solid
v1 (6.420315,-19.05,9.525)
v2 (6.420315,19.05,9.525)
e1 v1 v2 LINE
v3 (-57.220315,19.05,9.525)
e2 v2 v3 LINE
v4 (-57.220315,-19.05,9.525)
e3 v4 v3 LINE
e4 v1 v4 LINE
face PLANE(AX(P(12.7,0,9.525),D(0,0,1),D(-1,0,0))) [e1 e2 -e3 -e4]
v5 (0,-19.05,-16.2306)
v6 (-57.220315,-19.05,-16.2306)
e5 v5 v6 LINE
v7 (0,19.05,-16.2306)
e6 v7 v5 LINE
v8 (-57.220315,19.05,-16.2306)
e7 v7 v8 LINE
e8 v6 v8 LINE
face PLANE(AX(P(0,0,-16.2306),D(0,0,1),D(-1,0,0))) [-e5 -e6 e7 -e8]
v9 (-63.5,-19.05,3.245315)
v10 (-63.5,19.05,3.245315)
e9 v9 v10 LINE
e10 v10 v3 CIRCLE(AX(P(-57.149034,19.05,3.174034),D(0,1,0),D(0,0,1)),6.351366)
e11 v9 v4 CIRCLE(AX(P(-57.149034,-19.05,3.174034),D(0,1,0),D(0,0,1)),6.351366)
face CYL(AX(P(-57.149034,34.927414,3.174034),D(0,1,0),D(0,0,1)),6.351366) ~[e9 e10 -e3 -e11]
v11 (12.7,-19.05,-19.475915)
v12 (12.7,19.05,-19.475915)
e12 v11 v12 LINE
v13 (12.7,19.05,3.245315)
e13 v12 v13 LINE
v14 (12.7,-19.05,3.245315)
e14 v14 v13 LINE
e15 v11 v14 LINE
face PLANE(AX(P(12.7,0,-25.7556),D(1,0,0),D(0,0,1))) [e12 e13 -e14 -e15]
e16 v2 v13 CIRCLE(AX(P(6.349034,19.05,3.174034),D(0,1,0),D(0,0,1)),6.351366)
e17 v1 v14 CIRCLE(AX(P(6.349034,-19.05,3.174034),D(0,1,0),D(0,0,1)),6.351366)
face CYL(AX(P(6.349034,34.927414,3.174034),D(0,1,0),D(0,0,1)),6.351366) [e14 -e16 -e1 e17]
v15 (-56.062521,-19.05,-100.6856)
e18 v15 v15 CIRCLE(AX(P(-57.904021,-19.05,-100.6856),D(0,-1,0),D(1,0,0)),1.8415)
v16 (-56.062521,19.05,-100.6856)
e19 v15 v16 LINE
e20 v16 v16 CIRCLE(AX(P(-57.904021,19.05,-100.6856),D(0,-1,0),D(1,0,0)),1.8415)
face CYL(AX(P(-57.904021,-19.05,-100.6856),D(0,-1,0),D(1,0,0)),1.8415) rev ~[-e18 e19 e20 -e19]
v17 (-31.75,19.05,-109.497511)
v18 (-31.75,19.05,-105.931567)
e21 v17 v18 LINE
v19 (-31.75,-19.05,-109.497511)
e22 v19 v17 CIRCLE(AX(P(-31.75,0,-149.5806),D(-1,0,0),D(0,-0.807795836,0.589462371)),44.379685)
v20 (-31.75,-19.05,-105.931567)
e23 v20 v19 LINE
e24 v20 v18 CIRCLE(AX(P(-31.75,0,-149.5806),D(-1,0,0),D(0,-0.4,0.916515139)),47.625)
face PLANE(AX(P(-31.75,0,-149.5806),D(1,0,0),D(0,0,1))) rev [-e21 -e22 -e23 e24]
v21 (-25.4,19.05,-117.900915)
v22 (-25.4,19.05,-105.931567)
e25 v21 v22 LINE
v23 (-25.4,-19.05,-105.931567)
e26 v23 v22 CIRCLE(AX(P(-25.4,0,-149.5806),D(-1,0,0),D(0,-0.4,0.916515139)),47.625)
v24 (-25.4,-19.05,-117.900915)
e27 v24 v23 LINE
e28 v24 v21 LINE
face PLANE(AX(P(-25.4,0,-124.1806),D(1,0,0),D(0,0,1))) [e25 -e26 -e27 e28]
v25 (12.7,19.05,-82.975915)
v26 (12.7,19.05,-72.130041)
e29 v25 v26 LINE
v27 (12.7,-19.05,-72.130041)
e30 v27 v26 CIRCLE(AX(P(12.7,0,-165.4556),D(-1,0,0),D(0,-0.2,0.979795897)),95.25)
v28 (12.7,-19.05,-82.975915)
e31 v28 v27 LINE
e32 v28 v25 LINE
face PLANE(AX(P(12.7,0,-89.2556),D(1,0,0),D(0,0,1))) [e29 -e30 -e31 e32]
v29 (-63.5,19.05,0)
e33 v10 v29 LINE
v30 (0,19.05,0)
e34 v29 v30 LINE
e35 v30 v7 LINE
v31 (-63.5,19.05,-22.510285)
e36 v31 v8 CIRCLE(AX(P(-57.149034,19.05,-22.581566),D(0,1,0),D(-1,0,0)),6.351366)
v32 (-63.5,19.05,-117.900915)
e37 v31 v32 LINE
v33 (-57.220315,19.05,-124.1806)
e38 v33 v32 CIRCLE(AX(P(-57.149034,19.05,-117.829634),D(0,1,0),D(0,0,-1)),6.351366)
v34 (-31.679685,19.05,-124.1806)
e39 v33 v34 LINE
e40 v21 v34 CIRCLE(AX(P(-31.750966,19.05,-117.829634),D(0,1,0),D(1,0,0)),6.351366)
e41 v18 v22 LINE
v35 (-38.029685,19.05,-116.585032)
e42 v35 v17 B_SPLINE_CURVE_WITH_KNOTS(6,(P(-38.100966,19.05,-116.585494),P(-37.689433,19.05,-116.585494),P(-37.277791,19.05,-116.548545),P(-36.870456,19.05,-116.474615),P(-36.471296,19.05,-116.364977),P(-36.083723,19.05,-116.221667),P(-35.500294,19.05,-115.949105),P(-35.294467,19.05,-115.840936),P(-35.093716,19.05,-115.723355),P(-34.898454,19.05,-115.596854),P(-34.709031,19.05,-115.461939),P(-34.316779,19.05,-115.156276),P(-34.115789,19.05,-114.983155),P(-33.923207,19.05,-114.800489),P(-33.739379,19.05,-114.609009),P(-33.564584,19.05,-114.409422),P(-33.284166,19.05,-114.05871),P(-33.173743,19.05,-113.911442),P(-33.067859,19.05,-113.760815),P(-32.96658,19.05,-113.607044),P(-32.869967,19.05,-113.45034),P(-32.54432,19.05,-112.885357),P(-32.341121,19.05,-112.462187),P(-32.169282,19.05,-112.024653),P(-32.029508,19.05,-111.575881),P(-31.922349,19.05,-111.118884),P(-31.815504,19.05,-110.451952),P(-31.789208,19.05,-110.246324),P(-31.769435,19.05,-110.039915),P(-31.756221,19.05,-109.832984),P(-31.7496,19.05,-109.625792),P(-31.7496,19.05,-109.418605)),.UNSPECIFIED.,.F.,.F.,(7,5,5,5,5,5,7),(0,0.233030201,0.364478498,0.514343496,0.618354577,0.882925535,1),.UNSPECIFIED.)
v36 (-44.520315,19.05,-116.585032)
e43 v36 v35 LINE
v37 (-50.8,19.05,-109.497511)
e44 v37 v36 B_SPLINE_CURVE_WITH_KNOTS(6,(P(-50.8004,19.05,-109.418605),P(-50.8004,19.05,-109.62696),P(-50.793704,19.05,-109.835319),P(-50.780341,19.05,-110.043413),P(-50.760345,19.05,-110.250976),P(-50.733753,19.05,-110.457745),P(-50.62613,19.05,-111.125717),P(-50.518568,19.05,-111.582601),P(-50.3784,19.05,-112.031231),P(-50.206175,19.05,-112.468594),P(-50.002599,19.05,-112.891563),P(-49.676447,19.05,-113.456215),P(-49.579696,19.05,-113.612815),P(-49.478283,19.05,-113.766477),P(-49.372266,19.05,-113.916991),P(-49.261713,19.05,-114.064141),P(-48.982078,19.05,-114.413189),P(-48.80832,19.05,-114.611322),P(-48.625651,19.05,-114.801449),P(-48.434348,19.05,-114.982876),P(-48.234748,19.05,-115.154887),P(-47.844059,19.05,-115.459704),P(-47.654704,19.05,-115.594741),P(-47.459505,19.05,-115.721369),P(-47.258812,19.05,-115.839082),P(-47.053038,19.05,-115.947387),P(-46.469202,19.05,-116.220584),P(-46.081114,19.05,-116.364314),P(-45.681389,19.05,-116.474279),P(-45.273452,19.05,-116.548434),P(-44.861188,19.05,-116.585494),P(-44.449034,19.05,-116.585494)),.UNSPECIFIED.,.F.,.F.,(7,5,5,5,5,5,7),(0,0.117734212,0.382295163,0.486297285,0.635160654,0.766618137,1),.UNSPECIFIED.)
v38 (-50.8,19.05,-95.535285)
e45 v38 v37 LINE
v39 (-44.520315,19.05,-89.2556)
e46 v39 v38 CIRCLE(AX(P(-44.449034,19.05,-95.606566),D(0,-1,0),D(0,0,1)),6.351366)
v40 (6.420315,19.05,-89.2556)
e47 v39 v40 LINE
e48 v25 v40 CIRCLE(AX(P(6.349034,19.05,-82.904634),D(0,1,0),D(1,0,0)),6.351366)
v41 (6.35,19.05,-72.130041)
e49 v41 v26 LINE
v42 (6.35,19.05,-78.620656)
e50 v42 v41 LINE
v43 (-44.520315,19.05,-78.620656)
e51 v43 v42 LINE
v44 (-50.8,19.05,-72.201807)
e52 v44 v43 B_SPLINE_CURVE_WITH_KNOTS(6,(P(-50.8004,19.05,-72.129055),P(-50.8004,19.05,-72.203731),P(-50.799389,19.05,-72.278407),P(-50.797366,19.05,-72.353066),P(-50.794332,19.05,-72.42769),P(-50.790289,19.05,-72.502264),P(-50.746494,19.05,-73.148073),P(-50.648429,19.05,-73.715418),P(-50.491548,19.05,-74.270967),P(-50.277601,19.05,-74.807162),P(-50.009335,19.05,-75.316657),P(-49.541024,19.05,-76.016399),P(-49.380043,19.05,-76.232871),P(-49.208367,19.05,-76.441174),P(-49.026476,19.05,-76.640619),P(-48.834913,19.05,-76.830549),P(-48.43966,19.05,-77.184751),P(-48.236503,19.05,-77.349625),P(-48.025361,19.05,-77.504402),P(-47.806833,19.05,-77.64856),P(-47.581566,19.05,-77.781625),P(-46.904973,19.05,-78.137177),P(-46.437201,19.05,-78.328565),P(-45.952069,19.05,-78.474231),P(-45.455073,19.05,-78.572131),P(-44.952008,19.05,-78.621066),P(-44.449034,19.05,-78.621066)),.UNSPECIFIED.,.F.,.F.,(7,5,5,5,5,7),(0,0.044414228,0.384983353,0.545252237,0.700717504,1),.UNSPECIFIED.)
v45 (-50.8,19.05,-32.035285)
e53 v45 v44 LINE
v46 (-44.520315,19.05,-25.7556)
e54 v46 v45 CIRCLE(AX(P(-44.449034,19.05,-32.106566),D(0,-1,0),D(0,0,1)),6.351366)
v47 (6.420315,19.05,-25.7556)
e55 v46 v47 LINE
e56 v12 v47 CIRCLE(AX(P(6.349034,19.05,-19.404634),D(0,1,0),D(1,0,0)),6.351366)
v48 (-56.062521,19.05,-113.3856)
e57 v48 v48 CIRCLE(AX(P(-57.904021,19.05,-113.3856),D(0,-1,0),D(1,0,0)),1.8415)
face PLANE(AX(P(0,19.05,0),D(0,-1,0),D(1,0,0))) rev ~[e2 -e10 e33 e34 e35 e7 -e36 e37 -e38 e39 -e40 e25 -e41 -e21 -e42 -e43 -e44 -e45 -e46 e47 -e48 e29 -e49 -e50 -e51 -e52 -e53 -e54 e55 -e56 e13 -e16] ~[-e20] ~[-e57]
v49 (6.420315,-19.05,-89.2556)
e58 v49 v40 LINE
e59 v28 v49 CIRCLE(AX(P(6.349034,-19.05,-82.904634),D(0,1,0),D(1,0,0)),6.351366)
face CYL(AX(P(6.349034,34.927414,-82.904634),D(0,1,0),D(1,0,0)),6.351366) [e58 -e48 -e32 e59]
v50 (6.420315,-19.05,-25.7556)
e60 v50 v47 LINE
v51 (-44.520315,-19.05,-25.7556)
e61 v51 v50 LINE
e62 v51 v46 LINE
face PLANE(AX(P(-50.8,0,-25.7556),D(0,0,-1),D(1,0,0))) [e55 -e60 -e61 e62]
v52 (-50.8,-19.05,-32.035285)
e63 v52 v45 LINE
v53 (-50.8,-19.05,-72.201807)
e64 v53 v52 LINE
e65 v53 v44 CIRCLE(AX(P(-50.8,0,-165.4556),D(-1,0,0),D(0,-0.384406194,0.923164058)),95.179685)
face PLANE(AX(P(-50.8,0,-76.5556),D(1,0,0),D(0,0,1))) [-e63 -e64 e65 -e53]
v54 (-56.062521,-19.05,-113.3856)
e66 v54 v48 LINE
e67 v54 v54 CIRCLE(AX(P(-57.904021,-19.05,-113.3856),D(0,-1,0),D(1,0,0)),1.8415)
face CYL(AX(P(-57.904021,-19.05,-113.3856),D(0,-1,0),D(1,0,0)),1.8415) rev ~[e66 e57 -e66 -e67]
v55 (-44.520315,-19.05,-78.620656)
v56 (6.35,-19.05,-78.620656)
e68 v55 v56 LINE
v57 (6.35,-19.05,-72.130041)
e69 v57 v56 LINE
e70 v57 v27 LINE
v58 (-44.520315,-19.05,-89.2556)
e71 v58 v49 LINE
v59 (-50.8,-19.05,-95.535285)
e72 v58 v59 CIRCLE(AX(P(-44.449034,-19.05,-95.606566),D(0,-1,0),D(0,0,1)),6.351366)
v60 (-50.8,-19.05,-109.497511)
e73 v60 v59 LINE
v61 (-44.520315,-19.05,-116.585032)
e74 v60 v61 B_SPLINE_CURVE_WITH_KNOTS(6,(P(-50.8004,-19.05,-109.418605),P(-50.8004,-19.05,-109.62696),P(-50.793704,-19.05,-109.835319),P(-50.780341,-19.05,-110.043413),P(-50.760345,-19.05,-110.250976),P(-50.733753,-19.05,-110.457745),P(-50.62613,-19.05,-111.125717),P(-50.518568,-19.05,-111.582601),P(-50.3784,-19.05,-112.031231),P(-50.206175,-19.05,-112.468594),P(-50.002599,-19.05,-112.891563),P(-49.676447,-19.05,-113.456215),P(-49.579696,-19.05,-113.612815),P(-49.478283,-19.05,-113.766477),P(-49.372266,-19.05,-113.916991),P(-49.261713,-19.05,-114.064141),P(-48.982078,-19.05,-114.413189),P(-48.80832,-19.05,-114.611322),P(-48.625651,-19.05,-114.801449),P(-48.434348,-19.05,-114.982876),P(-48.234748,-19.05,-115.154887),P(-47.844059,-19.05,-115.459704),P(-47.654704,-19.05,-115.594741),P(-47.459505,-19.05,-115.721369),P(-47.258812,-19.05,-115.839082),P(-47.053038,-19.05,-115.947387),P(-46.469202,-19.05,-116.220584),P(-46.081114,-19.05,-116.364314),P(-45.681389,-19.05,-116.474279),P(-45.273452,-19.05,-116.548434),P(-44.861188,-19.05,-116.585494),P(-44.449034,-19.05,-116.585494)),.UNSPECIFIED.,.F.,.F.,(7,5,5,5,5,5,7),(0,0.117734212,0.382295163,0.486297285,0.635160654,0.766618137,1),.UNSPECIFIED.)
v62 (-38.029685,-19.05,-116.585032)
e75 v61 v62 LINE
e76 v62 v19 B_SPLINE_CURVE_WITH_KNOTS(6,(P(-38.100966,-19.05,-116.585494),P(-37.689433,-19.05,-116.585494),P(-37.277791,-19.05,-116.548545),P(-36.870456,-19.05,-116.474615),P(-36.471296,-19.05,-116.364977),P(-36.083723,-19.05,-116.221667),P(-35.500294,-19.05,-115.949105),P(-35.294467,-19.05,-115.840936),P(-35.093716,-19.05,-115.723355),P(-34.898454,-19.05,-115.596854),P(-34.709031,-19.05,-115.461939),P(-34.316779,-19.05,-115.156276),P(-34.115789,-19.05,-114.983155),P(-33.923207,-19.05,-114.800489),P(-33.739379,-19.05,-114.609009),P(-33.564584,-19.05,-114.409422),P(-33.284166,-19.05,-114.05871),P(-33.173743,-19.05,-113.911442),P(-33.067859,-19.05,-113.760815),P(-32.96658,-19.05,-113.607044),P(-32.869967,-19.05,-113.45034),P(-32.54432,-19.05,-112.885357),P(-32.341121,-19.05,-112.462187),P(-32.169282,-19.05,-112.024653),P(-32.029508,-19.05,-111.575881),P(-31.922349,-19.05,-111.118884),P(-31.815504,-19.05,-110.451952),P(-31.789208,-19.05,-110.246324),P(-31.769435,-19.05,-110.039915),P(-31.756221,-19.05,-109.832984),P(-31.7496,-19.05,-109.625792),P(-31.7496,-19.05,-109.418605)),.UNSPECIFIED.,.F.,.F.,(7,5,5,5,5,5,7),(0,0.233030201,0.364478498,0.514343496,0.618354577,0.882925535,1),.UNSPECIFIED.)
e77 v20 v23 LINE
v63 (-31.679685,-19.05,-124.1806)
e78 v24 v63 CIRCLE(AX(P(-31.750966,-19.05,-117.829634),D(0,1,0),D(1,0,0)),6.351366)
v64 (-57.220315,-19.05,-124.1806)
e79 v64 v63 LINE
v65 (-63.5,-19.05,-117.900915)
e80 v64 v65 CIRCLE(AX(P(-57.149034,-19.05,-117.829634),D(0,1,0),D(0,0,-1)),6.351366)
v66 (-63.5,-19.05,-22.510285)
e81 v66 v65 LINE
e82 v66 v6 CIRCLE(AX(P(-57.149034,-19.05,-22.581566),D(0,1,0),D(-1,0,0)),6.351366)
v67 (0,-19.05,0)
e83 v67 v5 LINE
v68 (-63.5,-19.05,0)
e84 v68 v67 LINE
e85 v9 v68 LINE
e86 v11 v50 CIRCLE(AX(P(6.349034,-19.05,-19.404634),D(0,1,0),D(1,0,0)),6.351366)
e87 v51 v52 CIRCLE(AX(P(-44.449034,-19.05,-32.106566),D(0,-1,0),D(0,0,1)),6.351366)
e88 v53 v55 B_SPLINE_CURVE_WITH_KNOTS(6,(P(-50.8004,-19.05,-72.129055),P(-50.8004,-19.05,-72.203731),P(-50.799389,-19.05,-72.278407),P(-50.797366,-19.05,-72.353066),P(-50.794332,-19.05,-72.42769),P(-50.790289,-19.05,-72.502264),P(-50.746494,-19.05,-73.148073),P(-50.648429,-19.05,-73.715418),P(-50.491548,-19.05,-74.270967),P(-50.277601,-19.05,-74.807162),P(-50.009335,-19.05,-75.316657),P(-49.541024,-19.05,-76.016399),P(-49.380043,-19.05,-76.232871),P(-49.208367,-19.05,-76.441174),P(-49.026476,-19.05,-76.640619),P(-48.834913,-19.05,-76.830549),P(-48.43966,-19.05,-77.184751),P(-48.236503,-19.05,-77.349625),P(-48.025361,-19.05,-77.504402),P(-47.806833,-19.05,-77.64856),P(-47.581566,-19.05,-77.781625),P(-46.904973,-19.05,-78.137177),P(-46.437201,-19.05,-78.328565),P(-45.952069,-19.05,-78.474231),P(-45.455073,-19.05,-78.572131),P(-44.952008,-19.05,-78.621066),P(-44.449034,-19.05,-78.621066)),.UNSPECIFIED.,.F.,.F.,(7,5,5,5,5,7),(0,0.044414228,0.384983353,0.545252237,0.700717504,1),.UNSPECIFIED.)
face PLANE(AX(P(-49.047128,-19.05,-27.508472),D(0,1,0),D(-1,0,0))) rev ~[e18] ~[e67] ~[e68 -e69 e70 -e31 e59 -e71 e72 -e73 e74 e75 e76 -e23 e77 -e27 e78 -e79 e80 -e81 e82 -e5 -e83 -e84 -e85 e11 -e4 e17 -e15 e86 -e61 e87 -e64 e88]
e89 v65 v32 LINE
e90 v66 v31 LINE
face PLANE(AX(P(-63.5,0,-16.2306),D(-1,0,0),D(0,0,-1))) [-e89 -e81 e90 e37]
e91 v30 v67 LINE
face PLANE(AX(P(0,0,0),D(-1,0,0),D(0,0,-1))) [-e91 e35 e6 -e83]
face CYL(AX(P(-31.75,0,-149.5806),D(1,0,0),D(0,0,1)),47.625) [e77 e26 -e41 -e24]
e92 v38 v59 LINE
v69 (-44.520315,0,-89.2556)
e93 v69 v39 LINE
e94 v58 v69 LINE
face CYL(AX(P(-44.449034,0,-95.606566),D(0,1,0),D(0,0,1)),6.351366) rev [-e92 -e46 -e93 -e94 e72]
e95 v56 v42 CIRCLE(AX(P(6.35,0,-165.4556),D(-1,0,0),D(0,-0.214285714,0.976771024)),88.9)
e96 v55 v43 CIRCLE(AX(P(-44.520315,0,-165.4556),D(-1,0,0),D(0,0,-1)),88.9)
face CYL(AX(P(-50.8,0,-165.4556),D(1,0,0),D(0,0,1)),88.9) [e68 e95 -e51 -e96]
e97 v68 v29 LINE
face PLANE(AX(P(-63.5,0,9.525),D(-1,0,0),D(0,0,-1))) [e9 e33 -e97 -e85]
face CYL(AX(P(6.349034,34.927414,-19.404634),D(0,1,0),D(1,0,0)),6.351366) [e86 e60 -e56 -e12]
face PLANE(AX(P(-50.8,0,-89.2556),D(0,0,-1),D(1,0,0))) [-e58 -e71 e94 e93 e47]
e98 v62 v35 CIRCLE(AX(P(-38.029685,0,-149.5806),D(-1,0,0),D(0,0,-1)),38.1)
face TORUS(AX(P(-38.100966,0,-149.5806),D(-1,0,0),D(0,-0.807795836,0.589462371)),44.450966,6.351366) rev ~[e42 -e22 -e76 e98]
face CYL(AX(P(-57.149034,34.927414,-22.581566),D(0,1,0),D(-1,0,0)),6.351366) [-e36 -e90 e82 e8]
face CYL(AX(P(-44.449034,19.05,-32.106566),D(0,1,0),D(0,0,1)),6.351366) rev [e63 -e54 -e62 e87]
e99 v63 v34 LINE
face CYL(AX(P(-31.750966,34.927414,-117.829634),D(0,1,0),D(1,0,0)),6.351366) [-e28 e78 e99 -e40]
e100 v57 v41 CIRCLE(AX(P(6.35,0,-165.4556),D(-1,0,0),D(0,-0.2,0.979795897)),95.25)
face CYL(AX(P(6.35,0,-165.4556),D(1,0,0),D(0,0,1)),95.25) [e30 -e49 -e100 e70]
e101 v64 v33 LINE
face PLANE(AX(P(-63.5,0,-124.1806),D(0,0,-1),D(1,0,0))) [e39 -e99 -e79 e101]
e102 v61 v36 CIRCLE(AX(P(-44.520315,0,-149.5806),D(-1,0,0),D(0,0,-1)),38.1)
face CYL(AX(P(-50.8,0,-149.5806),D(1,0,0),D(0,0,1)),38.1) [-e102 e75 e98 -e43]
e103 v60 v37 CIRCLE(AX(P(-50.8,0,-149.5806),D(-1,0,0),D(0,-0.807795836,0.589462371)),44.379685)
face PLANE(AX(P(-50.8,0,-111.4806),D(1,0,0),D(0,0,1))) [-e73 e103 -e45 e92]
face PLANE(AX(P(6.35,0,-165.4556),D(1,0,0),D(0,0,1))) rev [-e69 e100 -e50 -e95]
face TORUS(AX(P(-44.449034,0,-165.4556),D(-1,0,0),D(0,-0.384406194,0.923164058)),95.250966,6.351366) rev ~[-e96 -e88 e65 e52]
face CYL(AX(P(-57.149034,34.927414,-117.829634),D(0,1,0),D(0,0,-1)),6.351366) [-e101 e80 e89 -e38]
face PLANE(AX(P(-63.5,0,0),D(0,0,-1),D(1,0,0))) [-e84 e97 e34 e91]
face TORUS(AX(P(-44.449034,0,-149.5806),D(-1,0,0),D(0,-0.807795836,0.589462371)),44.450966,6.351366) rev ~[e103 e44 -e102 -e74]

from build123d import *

# Parameters (mm, degrees)
F1_DEPTH     = 19.05
F6_T1_DEPTH  = 38.1
F6_T3_DEPTH  = 19.05
F6_T5_DEPTH  = 19.05
F6_T10_ANGLE = 45.2137620144
F6_T16_ANGLE = 107.7622686142
F6_T22_ANGLE = 107.7622686142
F6_T25_DEPTH = 69.8548284901
F7_R         = 1.8415
F8_DEPTH     = 38.1010001


# Not quite as in the source:
# - a fillet or chamfer that OpenCascade refuses, or shapes differently, is made with other operations: its cross-section is extruded or revolved along the edge and cut away or added


with BuildPart() as f1:
    # F0 (on Front) → F1 (new body, symmetric)
    with BuildSketch(Plane.XZ):
        Polygon((-63.5, 0), (0, 0), (0, -16.2306), (-63.5, -16.2306), (-63.5, -124.1806), (-25.4, -124.1806), (-25.4, -101.9556), (-31.75, -101.9556), (-31.75, -111.4806), (-50.8, -111.4806), (-50.8, -89.2556), (12.7, -89.2556), (12.7, -70.2056), (6.35, -70.2056), (6.35, -76.5556), (-50.8, -76.5556), (-50.8, -25.7556), (12.7, -25.7556), (12.7, 9.525), (-63.5, 9.525), align=None)
    extrude(amount=F1_DEPTH, both=True)

    # F2 (on Front) → F3 (revolve, cut)
    with BuildSketch(Plane.XZ):
        Polygon((-50.8, -57.5056), (-50.8, -76.5556), (6.35, -76.5556), (6.35, -70.2056), (12.7, -70.2056), (12.7, -57.5056), align=None)
    revolve(axis=Axis((-20.4399991781, 0, -165.4556), (1, 0, 0)), mode=Mode.SUBTRACT)

    # F4 (on Front) → F5 (revolve, cut)
    with BuildSketch(Plane.XZ):
        Polygon((-50.8, -89.2556), (-50.8, -111.4806), (-31.75, -111.4806), (-31.75, -101.9556), (-25.4, -101.9556), (-25.4, -89.2556), align=None)
    revolve(axis=Axis((-41.275, 0, -149.5806), (1, 0, 0)), mode=Mode.SUBTRACT)

    # F6: fillet of radius 6.35 on 13 edges, made by hand

    # F6_s2 → F6_t1 (join)
    with BuildSketch(Plane.XZ.offset(-19.05)):
        with BuildLine():
            ThreePointArc((-44.4490343146, -25.7552), (-48.9401280605, -27.6154719395), (-50.8004, -32.1065656854))
            Line((-50.8004, -32.1065656854), (-51.4355365685, -32.1065656854))
            ThreePointArc((-51.4355365685, -32.1065656854), (-51.4351365685, -28.9310828427), (-51.4351365685, -25.7556))
            Line((-51.4351365685, -25.7556), (-50.8, -25.1204634315))
            ThreePointArc((-50.8, -25.1204634315), (-47.6245171573, -25.1204634315), (-44.4490343146, -25.1200634315))
            Line((-44.4490343146, -25.1200634315), (-44.4490343146, -25.7552))
        make_face()
    extrude(amount=F6_T1_DEPTH)

    # F6_s4 → F6_t3 (join)
    with BuildSketch(Plane.XZ.offset(-19.05)):
        with BuildLine():
            ThreePointArc((-44.4490343146, -89.2552), (-48.9401280605, -91.1154719395), (-50.8004, -95.6065656854))
            Line((-50.8004, -95.6065656854), (-51.4355365685, -95.6065656854))
            ThreePointArc((-51.4355365685, -95.6065656854), (-51.4351365685, -92.4310828427), (-51.4351365685, -89.2556))
            Line((-51.4351365685, -89.2556), (-50.8, -88.6204634315))
            ThreePointArc((-50.8, -88.6204634315), (-47.6245171573, -88.6204634315), (-44.4490343146, -88.6200634315))
            Line((-44.4490343146, -88.6200634315), (-44.4490343146, -89.2552))
        make_face()
    extrude(amount=F6_T3_DEPTH)

    # F6_s6 → F6_t5 (join)
    with BuildSketch(Plane.XZ):
        with BuildLine():
            ThreePointArc((-44.4490343146, -89.2552), (-48.9401280605, -91.1154719395), (-50.8004, -95.6065656854))
            Line((-50.8004, -95.6065656854), (-51.4355365685, -95.6065656854))
            ThreePointArc((-51.4355365685, -95.6065656854), (-51.4351365685, -92.4310828427), (-51.4351365685, -89.2556))
            Line((-51.4351365685, -89.2556), (-50.8, -88.6204634315))
            ThreePointArc((-50.8, -88.6204634315), (-47.6245171573, -88.6204634315), (-44.4490343146, -88.6200634315))
            Line((-44.4490343146, -88.6200634315), (-44.4490343146, -89.2552))
        make_face()
    extrude(amount=F6_T5_DEPTH)


with BuildPart() as f6_tool8:
    # F6_s9 → F6_t10 (revolve)
    with BuildSketch(Plane(origin=(0, -58.7152257849, -24.4490632784), x_dir=(1, 0, 0), z_dir=(0, -0.923164058, -0.384406194))):
        with BuildLine():
            ThreePointArc((-50.8004, -57.4916974353), (-48.9401280605, -61.9827911812), (-44.4490343146, -63.8430631207))
            Line((-44.4490343146, -63.8430631207), (-44.4490343146, -64.4781996892))
            ThreePointArc((-44.4490343146, -64.4781996892), (-47.6245171573, -64.4777996892), (-50.8, -64.4777996892))
            Line((-50.8, -64.4777996892), (-51.4351365685, -63.8426631207))
            ThreePointArc((-51.4351365685, -63.8426631207), (-51.4351365685, -60.667180278), (-51.4355365685, -57.4916974353))
            Line((-51.4355365685, -57.4916974353), (-50.8004, -57.4916974353))
        make_face()
    revolve(axis=Axis((-50.8, 0, -165.4556), (-1, 0, 0)), revolution_arc=F6_T10_ANGLE)

    split(bisect_by=Plane.XZ.offset(19.05), keep=Keep.BOTTOM)

    split(bisect_by=Plane.XZ.offset(-19.05), keep=Keep.TOP)


with BuildPart() as f1_1:
    add(f1.part)

    # F6_t7: union F6_tool8
    add(f6_tool8.part)


with BuildPart() as f6_tool14:
    # F6_s15 → F6_t16 (revolve)
    with BuildSketch(Plane(origin=(0, -71.2250836382, -97.6064441708), x_dir=(1, 0, 0), z_dir=(0, -0.589462371, -0.8077958363))):
        with BuildLine():
            ThreePointArc((-50.8004, -43.7211694448), (-48.9401280605, -48.2122631908), (-44.4490343146, -50.0725351302))
            Line((-44.4490343146, -50.0725351302), (-44.4490343146, -50.7076716988))
            ThreePointArc((-44.4490343146, -50.7076716988), (-47.6245171573, -50.7072716988), (-50.8, -50.7072716988))
            Line((-50.8, -50.7072716988), (-51.4351365685, -50.0721351302))
            ThreePointArc((-51.4351365685, -50.0721351302), (-51.4351365685, -46.8966522875), (-51.4355365685, -43.7211694448))
            Line((-51.4355365685, -43.7211694448), (-50.8004, -43.7211694448))
        make_face()
    revolve(axis=Axis((-50.8, 0, -149.5806), (-1, 0, 0)), revolution_arc=F6_T16_ANGLE)

    split(bisect_by=Plane.XZ.offset(19.05), keep=Keep.BOTTOM)

    split(bisect_by=Plane.XZ.offset(-19.05), keep=Keep.TOP)


with BuildPart() as f1_2:
    add(f1_1.part)

    # F6_t13: union F6_tool14
    add(f6_tool14.part)


with BuildPart() as f6_tool20:
    # F6_s21 → F6_t22 (revolve)
    with BuildSketch(Plane(origin=(0, -71.2250836382, -97.6064441708), x_dir=(1, 0, 0), z_dir=(0, -0.589462371, -0.8077958363))):
        with BuildLine():
            ThreePointArc((-38.1009656854, -50.0725351302), (-33.6098719395, -48.2122631908), (-31.7496, -43.7211694448))
            Line((-31.7496, -43.7211694448), (-31.1144634315, -43.7211694448))
            ThreePointArc((-31.1144634315, -43.7211694448), (-31.1148634315, -46.8966522875), (-31.1148634315, -50.0721351302))
            Line((-31.1148634315, -50.0721351302), (-31.75, -50.7072716988))
            ThreePointArc((-31.75, -50.7072716988), (-34.9254828427, -50.7072716988), (-38.1009656854, -50.7076716988))
            Line((-38.1009656854, -50.7076716988), (-38.1009656854, -50.0725351302))
        make_face()
    revolve(axis=Axis((-31.75, 0, -149.5806), (-1, 0, 0)), revolution_arc=F6_T22_ANGLE)

    split(bisect_by=Plane.XZ.offset(19.05), keep=Keep.BOTTOM)

    split(bisect_by=Plane.XZ.offset(-19.05), keep=Keep.TOP)


with BuildPart() as f1_3:
    add(f1_2.part)

    # F6_t19: union F6_tool20
    add(f6_tool20.part)

    # F6_s26 → F6_t25 (cut)
    with BuildSketch(Plane.XZ.offset(-34.9274142451)):
        with BuildLine():
            ThreePointArc((6.3490343146, 9.5254), (10.8401280605, 7.6651280605), (12.7004, 3.1740343146))
            Line((12.7004, 3.1740343146), (13.3355365685, 3.1740343146))
            ThreePointArc((13.3355365685, 3.1740343146), (13.3351365685, 6.3495171573), (13.3351365685, 9.525))
            Line((13.3351365685, 9.525), (12.7, 10.1601365685))
            ThreePointArc((12.7, 10.1601365685), (9.5245171573, 10.1601365685), (6.3490343146, 10.1605365685))
            Line((6.3490343146, 10.1605365685), (6.3490343146, 9.5254))
        make_face()
        with BuildLine():
            ThreePointArc((-57.1490343146, 9.5254), (-61.6401280605, 7.6651280605), (-63.5004, 3.1740343146))
            Line((-63.5004, 3.1740343146), (-64.1355365685, 3.1740343146))
            ThreePointArc((-64.1355365685, 3.1740343146), (-64.1351365685, 6.3495171573), (-64.1351365685, 9.525))
            Line((-64.1351365685, 9.525), (-63.5, 10.1601365685))
            ThreePointArc((-63.5, 10.1601365685), (-60.3245171573, 10.1601365685), (-57.1490343146, 10.1605365685))
            Line((-57.1490343146, 10.1605365685), (-57.1490343146, 9.5254))
        make_face()
        with BuildLine():
            ThreePointArc((-63.5004, -22.5815656854), (-61.6401280605, -18.0904719395), (-57.1490343146, -16.2302))
            Line((-57.1490343146, -16.2302), (-57.1490343146, -15.5950634315))
            ThreePointArc((-57.1490343146, -15.5950634315), (-60.3245171573, -15.5954634315), (-63.5, -15.5954634315))
            Line((-63.5, -15.5954634315), (-64.1351365685, -16.2306))
            ThreePointArc((-64.1351365685, -16.2306), (-64.1351365685, -19.4060828427), (-64.1355365685, -22.5815656854))
            Line((-64.1355365685, -22.5815656854), (-63.5004, -22.5815656854))
        make_face()
        with BuildLine():
            ThreePointArc((12.7004, -19.4046343146), (10.8401280605, -23.8957280605), (6.3490343146, -25.756))
            Line((6.3490343146, -25.756), (6.3490343146, -26.3911365685))
            ThreePointArc((6.3490343146, -26.3911365685), (9.5245171573, -26.3907365685), (12.7, -26.3907365685))
            Line((12.7, -26.3907365685), (13.3351365685, -25.7556))
            ThreePointArc((13.3351365685, -25.7556), (13.3351365685, -22.5801171573), (13.3355365685, -19.4046343146))
            Line((13.3355365685, -19.4046343146), (12.7004, -19.4046343146))
        make_face()
        with BuildLine():
            ThreePointArc((-57.1490343146, -124.181), (-61.6401280605, -122.3207280605), (-63.5004, -117.8296343146))
            Line((-63.5004, -117.8296343146), (-64.1355365685, -117.8296343146))
            ThreePointArc((-64.1355365685, -117.8296343146), (-64.1351365685, -121.0051171573), (-64.1351365685, -124.1806))
            Line((-64.1351365685, -124.1806), (-63.5, -124.8157365685))
            ThreePointArc((-63.5, -124.8157365685), (-60.3245171573, -124.8157365685), (-57.1490343146, -124.8161365685))
            Line((-57.1490343146, -124.8161365685), (-57.1490343146, -124.181))
        make_face()
        with BuildLine():
            ThreePointArc((-25.3996, -117.8296343146), (-27.2598719395, -122.3207280605), (-31.7509656854, -124.181))
            Line((-31.7509656854, -124.181), (-31.7509656854, -124.8161365685))
            ThreePointArc((-31.7509656854, -124.8161365685), (-28.5754828427, -124.8157365685), (-25.4, -124.8157365685))
            Line((-25.4, -124.8157365685), (-24.7648634315, -124.1806))
            ThreePointArc((-24.7648634315, -124.1806), (-24.7648634315, -121.0051171573), (-24.7644634315, -117.8296343146))
            Line((-24.7644634315, -117.8296343146), (-25.3996, -117.8296343146))
        make_face()
        with BuildLine():
            ThreePointArc((12.7004, -82.9046343146), (10.8401280605, -87.3957280605), (6.3490343146, -89.256))
            Line((6.3490343146, -89.256), (6.3490343146, -89.8911365685))
            ThreePointArc((6.3490343146, -89.8911365685), (9.5245171573, -89.8907365685), (12.7, -89.8907365685))
            Line((12.7, -89.8907365685), (13.3351365685, -89.2556))
            ThreePointArc((13.3351365685, -89.2556), (13.3351365685, -86.0801171573), (13.3355365685, -82.9046343146))
            Line((13.3355365685, -82.9046343146), (12.7004, -82.9046343146))
        make_face()
    extrude(amount=F6_T25_DEPTH, mode=Mode.SUBTRACT)

    # F7 (on face) → F8 (cut, through all)
    with BuildSketch(Plane.XZ.offset(19.05)):
        with Locations((-57.9040207225, -100.6856)):
            Circle(F7_R)
        with Locations((-57.9040207225, -113.3856)):
            Circle(F7_R)
    extrude(amount=-F8_DEPTH, mode=Mode.SUBTRACT)


solid = f1_3.part
